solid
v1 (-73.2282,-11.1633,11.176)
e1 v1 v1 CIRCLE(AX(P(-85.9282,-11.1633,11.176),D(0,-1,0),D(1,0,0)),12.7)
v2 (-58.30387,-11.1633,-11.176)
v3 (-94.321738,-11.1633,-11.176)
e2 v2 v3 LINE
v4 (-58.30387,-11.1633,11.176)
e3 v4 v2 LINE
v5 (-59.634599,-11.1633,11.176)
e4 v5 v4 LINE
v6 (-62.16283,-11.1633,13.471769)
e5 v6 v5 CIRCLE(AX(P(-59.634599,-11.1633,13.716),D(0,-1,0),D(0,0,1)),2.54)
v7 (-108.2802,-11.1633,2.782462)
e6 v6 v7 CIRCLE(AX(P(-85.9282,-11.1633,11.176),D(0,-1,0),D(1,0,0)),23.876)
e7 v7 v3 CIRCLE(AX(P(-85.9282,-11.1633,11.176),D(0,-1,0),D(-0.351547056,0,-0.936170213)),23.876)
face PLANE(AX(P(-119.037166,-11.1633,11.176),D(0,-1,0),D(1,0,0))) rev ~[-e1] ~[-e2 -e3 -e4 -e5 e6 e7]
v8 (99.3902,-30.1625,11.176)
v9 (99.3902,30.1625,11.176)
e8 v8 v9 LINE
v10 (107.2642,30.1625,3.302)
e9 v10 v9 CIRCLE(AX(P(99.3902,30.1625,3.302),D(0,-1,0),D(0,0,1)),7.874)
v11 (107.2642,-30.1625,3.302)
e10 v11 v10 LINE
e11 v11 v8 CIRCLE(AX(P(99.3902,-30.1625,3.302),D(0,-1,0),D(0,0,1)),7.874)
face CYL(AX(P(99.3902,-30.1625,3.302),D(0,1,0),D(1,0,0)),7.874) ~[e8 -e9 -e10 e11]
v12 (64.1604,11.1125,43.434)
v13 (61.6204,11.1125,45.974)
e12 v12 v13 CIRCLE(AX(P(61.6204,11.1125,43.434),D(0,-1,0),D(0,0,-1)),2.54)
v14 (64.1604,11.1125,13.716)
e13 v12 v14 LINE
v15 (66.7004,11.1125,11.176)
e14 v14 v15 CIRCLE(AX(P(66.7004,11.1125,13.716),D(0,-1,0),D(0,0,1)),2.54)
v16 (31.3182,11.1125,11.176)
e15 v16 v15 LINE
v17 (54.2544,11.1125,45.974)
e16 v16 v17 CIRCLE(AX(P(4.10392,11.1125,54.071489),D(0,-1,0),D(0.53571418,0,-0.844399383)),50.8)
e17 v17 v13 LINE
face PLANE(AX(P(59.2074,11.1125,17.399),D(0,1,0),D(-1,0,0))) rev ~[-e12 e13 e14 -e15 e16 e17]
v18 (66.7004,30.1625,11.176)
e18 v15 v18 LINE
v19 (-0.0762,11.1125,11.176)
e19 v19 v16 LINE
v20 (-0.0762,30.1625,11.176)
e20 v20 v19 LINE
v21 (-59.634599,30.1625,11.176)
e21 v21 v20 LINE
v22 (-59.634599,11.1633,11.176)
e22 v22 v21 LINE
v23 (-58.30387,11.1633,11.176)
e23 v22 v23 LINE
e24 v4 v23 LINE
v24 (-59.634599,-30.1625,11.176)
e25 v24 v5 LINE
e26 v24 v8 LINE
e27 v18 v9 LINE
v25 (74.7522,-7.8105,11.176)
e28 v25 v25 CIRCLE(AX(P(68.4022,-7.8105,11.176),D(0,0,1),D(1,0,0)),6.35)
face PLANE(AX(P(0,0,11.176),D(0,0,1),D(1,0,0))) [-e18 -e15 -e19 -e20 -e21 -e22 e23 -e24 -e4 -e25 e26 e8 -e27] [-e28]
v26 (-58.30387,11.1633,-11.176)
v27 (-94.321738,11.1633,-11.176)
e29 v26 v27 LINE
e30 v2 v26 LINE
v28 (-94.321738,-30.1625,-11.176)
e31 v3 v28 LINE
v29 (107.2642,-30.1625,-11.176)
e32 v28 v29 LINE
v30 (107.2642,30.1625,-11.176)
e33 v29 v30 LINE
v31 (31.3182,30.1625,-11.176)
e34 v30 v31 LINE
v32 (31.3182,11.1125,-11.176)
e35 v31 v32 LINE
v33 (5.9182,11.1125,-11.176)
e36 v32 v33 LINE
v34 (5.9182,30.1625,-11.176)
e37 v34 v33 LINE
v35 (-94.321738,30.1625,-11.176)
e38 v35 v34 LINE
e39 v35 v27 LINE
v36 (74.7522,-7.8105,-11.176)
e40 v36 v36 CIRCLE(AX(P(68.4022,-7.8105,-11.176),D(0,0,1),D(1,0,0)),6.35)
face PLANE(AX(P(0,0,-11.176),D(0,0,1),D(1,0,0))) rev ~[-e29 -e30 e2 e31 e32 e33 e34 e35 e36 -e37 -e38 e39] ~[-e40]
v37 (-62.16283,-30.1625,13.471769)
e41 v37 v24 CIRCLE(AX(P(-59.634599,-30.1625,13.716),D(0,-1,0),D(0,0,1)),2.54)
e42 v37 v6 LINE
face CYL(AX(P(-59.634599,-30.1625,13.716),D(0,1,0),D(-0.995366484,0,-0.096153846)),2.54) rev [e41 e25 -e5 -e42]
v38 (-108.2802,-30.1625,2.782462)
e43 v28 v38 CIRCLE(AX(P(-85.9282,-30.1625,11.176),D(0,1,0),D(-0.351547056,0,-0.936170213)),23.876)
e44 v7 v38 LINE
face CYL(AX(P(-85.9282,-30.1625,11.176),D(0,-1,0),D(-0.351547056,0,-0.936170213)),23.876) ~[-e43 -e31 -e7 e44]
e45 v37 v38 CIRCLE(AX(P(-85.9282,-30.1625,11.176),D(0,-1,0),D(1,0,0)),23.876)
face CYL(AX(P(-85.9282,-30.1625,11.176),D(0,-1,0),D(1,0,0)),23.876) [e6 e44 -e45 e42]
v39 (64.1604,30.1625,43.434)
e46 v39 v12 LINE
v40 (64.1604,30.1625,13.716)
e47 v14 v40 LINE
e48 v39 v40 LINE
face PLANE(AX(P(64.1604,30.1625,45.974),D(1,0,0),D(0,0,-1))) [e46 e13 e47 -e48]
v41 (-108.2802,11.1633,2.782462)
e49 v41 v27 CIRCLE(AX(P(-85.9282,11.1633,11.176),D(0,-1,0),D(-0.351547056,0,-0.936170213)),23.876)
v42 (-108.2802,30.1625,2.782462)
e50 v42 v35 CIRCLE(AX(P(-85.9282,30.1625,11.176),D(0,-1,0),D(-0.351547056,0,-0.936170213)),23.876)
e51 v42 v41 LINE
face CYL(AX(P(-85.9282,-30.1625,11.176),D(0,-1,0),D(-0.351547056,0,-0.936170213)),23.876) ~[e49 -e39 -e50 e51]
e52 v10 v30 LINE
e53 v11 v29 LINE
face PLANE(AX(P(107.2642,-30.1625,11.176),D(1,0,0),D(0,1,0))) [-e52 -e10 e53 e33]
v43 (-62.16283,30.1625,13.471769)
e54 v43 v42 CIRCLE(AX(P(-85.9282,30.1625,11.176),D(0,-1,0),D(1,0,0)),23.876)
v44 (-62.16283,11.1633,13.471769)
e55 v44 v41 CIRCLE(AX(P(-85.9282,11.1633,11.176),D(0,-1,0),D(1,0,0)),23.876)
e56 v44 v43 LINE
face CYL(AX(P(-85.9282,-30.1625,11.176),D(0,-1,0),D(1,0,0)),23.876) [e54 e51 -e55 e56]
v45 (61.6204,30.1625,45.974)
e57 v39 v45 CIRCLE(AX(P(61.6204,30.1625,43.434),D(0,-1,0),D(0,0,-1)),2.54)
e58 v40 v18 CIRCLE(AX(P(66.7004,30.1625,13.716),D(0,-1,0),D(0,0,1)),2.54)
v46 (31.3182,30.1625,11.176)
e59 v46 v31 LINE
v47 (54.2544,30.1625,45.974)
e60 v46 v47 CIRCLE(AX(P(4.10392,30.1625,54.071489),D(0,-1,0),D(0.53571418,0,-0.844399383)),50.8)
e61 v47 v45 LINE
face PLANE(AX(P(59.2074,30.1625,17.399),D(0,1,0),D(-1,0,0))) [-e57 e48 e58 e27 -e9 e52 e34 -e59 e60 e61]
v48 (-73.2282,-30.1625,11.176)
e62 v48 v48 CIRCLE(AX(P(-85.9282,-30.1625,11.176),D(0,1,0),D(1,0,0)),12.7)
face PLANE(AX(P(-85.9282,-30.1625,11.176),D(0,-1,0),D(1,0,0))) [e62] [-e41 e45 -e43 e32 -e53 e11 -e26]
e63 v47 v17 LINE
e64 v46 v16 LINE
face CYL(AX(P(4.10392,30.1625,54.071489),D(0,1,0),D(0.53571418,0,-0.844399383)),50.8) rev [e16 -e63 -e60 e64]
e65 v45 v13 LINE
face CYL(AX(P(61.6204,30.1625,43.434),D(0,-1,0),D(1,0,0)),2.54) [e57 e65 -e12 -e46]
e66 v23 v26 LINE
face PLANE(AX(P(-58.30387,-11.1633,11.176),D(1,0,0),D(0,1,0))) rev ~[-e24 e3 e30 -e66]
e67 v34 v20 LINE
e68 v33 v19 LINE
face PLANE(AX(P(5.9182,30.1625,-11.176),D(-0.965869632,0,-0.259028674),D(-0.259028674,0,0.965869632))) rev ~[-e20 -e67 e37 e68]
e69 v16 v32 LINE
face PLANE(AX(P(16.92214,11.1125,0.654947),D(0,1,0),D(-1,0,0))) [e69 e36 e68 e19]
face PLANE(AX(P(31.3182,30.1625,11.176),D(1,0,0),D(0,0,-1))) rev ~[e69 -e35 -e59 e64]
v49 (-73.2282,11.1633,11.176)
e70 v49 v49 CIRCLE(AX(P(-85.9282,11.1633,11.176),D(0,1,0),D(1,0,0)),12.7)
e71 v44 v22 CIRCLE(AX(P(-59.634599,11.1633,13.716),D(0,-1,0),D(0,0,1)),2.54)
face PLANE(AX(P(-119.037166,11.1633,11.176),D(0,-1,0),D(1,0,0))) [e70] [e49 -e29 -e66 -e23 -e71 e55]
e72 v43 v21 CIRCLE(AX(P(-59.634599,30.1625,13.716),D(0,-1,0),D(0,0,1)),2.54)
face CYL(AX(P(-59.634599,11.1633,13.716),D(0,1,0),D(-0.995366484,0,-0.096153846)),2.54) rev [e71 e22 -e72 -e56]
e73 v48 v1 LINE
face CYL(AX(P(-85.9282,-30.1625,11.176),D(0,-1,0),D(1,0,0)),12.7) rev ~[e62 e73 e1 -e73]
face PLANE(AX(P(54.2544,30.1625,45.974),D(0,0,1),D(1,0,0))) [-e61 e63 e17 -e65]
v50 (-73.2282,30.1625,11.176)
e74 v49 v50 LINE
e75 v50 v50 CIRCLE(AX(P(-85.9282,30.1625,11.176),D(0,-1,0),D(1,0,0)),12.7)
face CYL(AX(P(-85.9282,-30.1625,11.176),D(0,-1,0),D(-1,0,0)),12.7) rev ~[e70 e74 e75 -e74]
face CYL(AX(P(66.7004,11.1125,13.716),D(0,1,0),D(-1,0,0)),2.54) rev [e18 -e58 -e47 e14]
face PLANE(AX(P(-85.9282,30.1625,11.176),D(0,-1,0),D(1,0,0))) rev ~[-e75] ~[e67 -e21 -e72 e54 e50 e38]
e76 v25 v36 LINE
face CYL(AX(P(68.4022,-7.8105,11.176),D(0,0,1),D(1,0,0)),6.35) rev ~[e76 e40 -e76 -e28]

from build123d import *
from build123d import SkipClean  # not in build123d's __all__

# Parameters (mm, degrees)
F0_W          = 216.5604
F0_H          = 60.325
F1_DEPTH      = 11.176
F2_R          = 23.876
F2_R_2        = 12.7
F3_DEPTH      = 60.325
F5_DEPTH      = 60.326
F6_W          = 1.016
F6_H          = 60.325
F6_W_2        = 60.7332959771
F6_H_2        = 22.3266
F6_R          = 6.35
F7_DEPTH      = 22.353
F7_DEPTH_BACK = 23.877
F10_DEPTH     = 19.05
F11_DEPTH     = 19.05
F12_R         = 2.54
F13_R         = 7.874


# Not quite as in the source:
# - after a boolean that leaves OpenCascade's solid faulty, fix() repairs it


with BuildPart() as f1:
    # F0 (on Top) → F1 (new body, symmetric)
    with BuildSketch(Plane.XY):
        Rectangle(F0_W, F0_H)
    extrude(amount=F1_DEPTH, both=True)

    # F2 (on face) → F3 (join, through all)
    with BuildSketch(Plane.XZ.offset(30.1625)):
        with Locations((-85.9282, 11.176)):
            Circle(F2_R)
        with Locations((-85.9282, 11.176)):
            Circle(F2_R_2, mode=Mode.SUBTRACT)
    extrude(amount=-F3_DEPTH)

    # F4 (on face) → F5 (cut, through all)
    with BuildSketch(Plane.XZ.offset(30.1625)):
        with BuildLine():
            Line((-108.2802, -11.176), (-94.3217375141, -11.176))
            ThreePointArc((-94.3217375141, -11.176), (-102.8110815076, -5.7068815076), (-108.2802, 2.7824624859))
            Line((-108.2802, 2.7824624859), (-108.2802, -11.176))
        make_face()
        with BuildLine():
            Line((-77.5346624859, -11.176), (-94.3217375141, -11.176))
            ThreePointArc((-94.3217375141, -11.176), (-85.9282, -12.7), (-77.5346624859, -11.176))
        make_face()
        with BuildLine():
            ThreePointArc((-98.6282, 11.176), (-85.9282, -1.524), (-73.2282, 11.176))
            Line((-73.2282, 11.176), (-98.6282, 11.176))
        make_face()
    with SkipClean():  # cleaning this boolean's faces spoils the solid; the shape is the same uncleaned
        extrude(amount=-F5_DEPTH, mode=Mode.SUBTRACT)

    # F6 (on face) → F7 (cut, two sides)
    with BuildSketch(Plane.XY.offset(11.176)) as f7_sk:
        with Locations((107.7722, 0)):
            Rectangle(F6_W, F6_H)
        with Locations((-88.6705182493, 0)):
            Rectangle(F6_W_2, F6_H_2)
        with Locations((68.4022, -7.8105)):
            Circle(F6_R)
    with SkipClean():  # cleaning this boolean's faces spoils the solid; the shape is the same uncleaned
        extrude(amount=-F7_DEPTH, mode=Mode.SUBTRACT)
        extrude(f7_sk.sketch, amount=F7_DEPTH_BACK, mode=Mode.SUBTRACT)

    # F8 (on face) → F10 (cut)
    with BuildSketch(Plane(origin=(0, 30.1625, 0), x_dir=(-1, 0, 0), z_dir=(0, 1, 0))):
        Polygon((0.0762, 11.176), (-31.3182, 11.176), (-31.3182, -11.176), (-5.9182, -11.176), align=None)
    extrude(amount=-F10_DEPTH, mode=Mode.SUBTRACT)

    add(f1.part.fix(), mode=Mode.REPLACE)

    # F9 (on face) → F11 (join)
    with BuildSketch(Plane(origin=(0, 30.1625, 0), x_dir=(-1, 0, 0), z_dir=(0, 1, 0))):
        Polygon((-64.1604, 45.974), (-64.1604, -11.176), (-54.2544, -11.176), (-54.2544, 11.176), (-54.2544, 45.974), align=None)
        with BuildLine():
            Line((-54.2544, 45.974), (-54.2544, 11.176))
            Line((-54.2544, 11.176), (-31.3182, 11.176))
            ThreePointArc((-31.3182, 11.176), (-46.5191498234, 26.114588766), (-54.2544, 45.974))
        make_face()
    extrude(amount=-F11_DEPTH)

    add(f1.part.fix(), mode=Mode.REPLACE)

    # F12
    f12_edges = [f1.edges().sort_by_distance(p)[0] for p in [
        (-62.0522, 20.6629, 11.176),
        (-62.0522, -20.6629, 11.176),
        (64.1604, 20.6375, 45.974),
        (64.1604, 20.6375, 11.176),
    ]]
    fillet(f12_edges, radius=F12_R)

    # F13
    f13_edges = [f1.edges().sort_by_distance(p)[0] for p in [
        (107.2642, 0, 11.176),
    ]]
    fillet(f13_edges, radius=F13_R)


solid = f1.part
